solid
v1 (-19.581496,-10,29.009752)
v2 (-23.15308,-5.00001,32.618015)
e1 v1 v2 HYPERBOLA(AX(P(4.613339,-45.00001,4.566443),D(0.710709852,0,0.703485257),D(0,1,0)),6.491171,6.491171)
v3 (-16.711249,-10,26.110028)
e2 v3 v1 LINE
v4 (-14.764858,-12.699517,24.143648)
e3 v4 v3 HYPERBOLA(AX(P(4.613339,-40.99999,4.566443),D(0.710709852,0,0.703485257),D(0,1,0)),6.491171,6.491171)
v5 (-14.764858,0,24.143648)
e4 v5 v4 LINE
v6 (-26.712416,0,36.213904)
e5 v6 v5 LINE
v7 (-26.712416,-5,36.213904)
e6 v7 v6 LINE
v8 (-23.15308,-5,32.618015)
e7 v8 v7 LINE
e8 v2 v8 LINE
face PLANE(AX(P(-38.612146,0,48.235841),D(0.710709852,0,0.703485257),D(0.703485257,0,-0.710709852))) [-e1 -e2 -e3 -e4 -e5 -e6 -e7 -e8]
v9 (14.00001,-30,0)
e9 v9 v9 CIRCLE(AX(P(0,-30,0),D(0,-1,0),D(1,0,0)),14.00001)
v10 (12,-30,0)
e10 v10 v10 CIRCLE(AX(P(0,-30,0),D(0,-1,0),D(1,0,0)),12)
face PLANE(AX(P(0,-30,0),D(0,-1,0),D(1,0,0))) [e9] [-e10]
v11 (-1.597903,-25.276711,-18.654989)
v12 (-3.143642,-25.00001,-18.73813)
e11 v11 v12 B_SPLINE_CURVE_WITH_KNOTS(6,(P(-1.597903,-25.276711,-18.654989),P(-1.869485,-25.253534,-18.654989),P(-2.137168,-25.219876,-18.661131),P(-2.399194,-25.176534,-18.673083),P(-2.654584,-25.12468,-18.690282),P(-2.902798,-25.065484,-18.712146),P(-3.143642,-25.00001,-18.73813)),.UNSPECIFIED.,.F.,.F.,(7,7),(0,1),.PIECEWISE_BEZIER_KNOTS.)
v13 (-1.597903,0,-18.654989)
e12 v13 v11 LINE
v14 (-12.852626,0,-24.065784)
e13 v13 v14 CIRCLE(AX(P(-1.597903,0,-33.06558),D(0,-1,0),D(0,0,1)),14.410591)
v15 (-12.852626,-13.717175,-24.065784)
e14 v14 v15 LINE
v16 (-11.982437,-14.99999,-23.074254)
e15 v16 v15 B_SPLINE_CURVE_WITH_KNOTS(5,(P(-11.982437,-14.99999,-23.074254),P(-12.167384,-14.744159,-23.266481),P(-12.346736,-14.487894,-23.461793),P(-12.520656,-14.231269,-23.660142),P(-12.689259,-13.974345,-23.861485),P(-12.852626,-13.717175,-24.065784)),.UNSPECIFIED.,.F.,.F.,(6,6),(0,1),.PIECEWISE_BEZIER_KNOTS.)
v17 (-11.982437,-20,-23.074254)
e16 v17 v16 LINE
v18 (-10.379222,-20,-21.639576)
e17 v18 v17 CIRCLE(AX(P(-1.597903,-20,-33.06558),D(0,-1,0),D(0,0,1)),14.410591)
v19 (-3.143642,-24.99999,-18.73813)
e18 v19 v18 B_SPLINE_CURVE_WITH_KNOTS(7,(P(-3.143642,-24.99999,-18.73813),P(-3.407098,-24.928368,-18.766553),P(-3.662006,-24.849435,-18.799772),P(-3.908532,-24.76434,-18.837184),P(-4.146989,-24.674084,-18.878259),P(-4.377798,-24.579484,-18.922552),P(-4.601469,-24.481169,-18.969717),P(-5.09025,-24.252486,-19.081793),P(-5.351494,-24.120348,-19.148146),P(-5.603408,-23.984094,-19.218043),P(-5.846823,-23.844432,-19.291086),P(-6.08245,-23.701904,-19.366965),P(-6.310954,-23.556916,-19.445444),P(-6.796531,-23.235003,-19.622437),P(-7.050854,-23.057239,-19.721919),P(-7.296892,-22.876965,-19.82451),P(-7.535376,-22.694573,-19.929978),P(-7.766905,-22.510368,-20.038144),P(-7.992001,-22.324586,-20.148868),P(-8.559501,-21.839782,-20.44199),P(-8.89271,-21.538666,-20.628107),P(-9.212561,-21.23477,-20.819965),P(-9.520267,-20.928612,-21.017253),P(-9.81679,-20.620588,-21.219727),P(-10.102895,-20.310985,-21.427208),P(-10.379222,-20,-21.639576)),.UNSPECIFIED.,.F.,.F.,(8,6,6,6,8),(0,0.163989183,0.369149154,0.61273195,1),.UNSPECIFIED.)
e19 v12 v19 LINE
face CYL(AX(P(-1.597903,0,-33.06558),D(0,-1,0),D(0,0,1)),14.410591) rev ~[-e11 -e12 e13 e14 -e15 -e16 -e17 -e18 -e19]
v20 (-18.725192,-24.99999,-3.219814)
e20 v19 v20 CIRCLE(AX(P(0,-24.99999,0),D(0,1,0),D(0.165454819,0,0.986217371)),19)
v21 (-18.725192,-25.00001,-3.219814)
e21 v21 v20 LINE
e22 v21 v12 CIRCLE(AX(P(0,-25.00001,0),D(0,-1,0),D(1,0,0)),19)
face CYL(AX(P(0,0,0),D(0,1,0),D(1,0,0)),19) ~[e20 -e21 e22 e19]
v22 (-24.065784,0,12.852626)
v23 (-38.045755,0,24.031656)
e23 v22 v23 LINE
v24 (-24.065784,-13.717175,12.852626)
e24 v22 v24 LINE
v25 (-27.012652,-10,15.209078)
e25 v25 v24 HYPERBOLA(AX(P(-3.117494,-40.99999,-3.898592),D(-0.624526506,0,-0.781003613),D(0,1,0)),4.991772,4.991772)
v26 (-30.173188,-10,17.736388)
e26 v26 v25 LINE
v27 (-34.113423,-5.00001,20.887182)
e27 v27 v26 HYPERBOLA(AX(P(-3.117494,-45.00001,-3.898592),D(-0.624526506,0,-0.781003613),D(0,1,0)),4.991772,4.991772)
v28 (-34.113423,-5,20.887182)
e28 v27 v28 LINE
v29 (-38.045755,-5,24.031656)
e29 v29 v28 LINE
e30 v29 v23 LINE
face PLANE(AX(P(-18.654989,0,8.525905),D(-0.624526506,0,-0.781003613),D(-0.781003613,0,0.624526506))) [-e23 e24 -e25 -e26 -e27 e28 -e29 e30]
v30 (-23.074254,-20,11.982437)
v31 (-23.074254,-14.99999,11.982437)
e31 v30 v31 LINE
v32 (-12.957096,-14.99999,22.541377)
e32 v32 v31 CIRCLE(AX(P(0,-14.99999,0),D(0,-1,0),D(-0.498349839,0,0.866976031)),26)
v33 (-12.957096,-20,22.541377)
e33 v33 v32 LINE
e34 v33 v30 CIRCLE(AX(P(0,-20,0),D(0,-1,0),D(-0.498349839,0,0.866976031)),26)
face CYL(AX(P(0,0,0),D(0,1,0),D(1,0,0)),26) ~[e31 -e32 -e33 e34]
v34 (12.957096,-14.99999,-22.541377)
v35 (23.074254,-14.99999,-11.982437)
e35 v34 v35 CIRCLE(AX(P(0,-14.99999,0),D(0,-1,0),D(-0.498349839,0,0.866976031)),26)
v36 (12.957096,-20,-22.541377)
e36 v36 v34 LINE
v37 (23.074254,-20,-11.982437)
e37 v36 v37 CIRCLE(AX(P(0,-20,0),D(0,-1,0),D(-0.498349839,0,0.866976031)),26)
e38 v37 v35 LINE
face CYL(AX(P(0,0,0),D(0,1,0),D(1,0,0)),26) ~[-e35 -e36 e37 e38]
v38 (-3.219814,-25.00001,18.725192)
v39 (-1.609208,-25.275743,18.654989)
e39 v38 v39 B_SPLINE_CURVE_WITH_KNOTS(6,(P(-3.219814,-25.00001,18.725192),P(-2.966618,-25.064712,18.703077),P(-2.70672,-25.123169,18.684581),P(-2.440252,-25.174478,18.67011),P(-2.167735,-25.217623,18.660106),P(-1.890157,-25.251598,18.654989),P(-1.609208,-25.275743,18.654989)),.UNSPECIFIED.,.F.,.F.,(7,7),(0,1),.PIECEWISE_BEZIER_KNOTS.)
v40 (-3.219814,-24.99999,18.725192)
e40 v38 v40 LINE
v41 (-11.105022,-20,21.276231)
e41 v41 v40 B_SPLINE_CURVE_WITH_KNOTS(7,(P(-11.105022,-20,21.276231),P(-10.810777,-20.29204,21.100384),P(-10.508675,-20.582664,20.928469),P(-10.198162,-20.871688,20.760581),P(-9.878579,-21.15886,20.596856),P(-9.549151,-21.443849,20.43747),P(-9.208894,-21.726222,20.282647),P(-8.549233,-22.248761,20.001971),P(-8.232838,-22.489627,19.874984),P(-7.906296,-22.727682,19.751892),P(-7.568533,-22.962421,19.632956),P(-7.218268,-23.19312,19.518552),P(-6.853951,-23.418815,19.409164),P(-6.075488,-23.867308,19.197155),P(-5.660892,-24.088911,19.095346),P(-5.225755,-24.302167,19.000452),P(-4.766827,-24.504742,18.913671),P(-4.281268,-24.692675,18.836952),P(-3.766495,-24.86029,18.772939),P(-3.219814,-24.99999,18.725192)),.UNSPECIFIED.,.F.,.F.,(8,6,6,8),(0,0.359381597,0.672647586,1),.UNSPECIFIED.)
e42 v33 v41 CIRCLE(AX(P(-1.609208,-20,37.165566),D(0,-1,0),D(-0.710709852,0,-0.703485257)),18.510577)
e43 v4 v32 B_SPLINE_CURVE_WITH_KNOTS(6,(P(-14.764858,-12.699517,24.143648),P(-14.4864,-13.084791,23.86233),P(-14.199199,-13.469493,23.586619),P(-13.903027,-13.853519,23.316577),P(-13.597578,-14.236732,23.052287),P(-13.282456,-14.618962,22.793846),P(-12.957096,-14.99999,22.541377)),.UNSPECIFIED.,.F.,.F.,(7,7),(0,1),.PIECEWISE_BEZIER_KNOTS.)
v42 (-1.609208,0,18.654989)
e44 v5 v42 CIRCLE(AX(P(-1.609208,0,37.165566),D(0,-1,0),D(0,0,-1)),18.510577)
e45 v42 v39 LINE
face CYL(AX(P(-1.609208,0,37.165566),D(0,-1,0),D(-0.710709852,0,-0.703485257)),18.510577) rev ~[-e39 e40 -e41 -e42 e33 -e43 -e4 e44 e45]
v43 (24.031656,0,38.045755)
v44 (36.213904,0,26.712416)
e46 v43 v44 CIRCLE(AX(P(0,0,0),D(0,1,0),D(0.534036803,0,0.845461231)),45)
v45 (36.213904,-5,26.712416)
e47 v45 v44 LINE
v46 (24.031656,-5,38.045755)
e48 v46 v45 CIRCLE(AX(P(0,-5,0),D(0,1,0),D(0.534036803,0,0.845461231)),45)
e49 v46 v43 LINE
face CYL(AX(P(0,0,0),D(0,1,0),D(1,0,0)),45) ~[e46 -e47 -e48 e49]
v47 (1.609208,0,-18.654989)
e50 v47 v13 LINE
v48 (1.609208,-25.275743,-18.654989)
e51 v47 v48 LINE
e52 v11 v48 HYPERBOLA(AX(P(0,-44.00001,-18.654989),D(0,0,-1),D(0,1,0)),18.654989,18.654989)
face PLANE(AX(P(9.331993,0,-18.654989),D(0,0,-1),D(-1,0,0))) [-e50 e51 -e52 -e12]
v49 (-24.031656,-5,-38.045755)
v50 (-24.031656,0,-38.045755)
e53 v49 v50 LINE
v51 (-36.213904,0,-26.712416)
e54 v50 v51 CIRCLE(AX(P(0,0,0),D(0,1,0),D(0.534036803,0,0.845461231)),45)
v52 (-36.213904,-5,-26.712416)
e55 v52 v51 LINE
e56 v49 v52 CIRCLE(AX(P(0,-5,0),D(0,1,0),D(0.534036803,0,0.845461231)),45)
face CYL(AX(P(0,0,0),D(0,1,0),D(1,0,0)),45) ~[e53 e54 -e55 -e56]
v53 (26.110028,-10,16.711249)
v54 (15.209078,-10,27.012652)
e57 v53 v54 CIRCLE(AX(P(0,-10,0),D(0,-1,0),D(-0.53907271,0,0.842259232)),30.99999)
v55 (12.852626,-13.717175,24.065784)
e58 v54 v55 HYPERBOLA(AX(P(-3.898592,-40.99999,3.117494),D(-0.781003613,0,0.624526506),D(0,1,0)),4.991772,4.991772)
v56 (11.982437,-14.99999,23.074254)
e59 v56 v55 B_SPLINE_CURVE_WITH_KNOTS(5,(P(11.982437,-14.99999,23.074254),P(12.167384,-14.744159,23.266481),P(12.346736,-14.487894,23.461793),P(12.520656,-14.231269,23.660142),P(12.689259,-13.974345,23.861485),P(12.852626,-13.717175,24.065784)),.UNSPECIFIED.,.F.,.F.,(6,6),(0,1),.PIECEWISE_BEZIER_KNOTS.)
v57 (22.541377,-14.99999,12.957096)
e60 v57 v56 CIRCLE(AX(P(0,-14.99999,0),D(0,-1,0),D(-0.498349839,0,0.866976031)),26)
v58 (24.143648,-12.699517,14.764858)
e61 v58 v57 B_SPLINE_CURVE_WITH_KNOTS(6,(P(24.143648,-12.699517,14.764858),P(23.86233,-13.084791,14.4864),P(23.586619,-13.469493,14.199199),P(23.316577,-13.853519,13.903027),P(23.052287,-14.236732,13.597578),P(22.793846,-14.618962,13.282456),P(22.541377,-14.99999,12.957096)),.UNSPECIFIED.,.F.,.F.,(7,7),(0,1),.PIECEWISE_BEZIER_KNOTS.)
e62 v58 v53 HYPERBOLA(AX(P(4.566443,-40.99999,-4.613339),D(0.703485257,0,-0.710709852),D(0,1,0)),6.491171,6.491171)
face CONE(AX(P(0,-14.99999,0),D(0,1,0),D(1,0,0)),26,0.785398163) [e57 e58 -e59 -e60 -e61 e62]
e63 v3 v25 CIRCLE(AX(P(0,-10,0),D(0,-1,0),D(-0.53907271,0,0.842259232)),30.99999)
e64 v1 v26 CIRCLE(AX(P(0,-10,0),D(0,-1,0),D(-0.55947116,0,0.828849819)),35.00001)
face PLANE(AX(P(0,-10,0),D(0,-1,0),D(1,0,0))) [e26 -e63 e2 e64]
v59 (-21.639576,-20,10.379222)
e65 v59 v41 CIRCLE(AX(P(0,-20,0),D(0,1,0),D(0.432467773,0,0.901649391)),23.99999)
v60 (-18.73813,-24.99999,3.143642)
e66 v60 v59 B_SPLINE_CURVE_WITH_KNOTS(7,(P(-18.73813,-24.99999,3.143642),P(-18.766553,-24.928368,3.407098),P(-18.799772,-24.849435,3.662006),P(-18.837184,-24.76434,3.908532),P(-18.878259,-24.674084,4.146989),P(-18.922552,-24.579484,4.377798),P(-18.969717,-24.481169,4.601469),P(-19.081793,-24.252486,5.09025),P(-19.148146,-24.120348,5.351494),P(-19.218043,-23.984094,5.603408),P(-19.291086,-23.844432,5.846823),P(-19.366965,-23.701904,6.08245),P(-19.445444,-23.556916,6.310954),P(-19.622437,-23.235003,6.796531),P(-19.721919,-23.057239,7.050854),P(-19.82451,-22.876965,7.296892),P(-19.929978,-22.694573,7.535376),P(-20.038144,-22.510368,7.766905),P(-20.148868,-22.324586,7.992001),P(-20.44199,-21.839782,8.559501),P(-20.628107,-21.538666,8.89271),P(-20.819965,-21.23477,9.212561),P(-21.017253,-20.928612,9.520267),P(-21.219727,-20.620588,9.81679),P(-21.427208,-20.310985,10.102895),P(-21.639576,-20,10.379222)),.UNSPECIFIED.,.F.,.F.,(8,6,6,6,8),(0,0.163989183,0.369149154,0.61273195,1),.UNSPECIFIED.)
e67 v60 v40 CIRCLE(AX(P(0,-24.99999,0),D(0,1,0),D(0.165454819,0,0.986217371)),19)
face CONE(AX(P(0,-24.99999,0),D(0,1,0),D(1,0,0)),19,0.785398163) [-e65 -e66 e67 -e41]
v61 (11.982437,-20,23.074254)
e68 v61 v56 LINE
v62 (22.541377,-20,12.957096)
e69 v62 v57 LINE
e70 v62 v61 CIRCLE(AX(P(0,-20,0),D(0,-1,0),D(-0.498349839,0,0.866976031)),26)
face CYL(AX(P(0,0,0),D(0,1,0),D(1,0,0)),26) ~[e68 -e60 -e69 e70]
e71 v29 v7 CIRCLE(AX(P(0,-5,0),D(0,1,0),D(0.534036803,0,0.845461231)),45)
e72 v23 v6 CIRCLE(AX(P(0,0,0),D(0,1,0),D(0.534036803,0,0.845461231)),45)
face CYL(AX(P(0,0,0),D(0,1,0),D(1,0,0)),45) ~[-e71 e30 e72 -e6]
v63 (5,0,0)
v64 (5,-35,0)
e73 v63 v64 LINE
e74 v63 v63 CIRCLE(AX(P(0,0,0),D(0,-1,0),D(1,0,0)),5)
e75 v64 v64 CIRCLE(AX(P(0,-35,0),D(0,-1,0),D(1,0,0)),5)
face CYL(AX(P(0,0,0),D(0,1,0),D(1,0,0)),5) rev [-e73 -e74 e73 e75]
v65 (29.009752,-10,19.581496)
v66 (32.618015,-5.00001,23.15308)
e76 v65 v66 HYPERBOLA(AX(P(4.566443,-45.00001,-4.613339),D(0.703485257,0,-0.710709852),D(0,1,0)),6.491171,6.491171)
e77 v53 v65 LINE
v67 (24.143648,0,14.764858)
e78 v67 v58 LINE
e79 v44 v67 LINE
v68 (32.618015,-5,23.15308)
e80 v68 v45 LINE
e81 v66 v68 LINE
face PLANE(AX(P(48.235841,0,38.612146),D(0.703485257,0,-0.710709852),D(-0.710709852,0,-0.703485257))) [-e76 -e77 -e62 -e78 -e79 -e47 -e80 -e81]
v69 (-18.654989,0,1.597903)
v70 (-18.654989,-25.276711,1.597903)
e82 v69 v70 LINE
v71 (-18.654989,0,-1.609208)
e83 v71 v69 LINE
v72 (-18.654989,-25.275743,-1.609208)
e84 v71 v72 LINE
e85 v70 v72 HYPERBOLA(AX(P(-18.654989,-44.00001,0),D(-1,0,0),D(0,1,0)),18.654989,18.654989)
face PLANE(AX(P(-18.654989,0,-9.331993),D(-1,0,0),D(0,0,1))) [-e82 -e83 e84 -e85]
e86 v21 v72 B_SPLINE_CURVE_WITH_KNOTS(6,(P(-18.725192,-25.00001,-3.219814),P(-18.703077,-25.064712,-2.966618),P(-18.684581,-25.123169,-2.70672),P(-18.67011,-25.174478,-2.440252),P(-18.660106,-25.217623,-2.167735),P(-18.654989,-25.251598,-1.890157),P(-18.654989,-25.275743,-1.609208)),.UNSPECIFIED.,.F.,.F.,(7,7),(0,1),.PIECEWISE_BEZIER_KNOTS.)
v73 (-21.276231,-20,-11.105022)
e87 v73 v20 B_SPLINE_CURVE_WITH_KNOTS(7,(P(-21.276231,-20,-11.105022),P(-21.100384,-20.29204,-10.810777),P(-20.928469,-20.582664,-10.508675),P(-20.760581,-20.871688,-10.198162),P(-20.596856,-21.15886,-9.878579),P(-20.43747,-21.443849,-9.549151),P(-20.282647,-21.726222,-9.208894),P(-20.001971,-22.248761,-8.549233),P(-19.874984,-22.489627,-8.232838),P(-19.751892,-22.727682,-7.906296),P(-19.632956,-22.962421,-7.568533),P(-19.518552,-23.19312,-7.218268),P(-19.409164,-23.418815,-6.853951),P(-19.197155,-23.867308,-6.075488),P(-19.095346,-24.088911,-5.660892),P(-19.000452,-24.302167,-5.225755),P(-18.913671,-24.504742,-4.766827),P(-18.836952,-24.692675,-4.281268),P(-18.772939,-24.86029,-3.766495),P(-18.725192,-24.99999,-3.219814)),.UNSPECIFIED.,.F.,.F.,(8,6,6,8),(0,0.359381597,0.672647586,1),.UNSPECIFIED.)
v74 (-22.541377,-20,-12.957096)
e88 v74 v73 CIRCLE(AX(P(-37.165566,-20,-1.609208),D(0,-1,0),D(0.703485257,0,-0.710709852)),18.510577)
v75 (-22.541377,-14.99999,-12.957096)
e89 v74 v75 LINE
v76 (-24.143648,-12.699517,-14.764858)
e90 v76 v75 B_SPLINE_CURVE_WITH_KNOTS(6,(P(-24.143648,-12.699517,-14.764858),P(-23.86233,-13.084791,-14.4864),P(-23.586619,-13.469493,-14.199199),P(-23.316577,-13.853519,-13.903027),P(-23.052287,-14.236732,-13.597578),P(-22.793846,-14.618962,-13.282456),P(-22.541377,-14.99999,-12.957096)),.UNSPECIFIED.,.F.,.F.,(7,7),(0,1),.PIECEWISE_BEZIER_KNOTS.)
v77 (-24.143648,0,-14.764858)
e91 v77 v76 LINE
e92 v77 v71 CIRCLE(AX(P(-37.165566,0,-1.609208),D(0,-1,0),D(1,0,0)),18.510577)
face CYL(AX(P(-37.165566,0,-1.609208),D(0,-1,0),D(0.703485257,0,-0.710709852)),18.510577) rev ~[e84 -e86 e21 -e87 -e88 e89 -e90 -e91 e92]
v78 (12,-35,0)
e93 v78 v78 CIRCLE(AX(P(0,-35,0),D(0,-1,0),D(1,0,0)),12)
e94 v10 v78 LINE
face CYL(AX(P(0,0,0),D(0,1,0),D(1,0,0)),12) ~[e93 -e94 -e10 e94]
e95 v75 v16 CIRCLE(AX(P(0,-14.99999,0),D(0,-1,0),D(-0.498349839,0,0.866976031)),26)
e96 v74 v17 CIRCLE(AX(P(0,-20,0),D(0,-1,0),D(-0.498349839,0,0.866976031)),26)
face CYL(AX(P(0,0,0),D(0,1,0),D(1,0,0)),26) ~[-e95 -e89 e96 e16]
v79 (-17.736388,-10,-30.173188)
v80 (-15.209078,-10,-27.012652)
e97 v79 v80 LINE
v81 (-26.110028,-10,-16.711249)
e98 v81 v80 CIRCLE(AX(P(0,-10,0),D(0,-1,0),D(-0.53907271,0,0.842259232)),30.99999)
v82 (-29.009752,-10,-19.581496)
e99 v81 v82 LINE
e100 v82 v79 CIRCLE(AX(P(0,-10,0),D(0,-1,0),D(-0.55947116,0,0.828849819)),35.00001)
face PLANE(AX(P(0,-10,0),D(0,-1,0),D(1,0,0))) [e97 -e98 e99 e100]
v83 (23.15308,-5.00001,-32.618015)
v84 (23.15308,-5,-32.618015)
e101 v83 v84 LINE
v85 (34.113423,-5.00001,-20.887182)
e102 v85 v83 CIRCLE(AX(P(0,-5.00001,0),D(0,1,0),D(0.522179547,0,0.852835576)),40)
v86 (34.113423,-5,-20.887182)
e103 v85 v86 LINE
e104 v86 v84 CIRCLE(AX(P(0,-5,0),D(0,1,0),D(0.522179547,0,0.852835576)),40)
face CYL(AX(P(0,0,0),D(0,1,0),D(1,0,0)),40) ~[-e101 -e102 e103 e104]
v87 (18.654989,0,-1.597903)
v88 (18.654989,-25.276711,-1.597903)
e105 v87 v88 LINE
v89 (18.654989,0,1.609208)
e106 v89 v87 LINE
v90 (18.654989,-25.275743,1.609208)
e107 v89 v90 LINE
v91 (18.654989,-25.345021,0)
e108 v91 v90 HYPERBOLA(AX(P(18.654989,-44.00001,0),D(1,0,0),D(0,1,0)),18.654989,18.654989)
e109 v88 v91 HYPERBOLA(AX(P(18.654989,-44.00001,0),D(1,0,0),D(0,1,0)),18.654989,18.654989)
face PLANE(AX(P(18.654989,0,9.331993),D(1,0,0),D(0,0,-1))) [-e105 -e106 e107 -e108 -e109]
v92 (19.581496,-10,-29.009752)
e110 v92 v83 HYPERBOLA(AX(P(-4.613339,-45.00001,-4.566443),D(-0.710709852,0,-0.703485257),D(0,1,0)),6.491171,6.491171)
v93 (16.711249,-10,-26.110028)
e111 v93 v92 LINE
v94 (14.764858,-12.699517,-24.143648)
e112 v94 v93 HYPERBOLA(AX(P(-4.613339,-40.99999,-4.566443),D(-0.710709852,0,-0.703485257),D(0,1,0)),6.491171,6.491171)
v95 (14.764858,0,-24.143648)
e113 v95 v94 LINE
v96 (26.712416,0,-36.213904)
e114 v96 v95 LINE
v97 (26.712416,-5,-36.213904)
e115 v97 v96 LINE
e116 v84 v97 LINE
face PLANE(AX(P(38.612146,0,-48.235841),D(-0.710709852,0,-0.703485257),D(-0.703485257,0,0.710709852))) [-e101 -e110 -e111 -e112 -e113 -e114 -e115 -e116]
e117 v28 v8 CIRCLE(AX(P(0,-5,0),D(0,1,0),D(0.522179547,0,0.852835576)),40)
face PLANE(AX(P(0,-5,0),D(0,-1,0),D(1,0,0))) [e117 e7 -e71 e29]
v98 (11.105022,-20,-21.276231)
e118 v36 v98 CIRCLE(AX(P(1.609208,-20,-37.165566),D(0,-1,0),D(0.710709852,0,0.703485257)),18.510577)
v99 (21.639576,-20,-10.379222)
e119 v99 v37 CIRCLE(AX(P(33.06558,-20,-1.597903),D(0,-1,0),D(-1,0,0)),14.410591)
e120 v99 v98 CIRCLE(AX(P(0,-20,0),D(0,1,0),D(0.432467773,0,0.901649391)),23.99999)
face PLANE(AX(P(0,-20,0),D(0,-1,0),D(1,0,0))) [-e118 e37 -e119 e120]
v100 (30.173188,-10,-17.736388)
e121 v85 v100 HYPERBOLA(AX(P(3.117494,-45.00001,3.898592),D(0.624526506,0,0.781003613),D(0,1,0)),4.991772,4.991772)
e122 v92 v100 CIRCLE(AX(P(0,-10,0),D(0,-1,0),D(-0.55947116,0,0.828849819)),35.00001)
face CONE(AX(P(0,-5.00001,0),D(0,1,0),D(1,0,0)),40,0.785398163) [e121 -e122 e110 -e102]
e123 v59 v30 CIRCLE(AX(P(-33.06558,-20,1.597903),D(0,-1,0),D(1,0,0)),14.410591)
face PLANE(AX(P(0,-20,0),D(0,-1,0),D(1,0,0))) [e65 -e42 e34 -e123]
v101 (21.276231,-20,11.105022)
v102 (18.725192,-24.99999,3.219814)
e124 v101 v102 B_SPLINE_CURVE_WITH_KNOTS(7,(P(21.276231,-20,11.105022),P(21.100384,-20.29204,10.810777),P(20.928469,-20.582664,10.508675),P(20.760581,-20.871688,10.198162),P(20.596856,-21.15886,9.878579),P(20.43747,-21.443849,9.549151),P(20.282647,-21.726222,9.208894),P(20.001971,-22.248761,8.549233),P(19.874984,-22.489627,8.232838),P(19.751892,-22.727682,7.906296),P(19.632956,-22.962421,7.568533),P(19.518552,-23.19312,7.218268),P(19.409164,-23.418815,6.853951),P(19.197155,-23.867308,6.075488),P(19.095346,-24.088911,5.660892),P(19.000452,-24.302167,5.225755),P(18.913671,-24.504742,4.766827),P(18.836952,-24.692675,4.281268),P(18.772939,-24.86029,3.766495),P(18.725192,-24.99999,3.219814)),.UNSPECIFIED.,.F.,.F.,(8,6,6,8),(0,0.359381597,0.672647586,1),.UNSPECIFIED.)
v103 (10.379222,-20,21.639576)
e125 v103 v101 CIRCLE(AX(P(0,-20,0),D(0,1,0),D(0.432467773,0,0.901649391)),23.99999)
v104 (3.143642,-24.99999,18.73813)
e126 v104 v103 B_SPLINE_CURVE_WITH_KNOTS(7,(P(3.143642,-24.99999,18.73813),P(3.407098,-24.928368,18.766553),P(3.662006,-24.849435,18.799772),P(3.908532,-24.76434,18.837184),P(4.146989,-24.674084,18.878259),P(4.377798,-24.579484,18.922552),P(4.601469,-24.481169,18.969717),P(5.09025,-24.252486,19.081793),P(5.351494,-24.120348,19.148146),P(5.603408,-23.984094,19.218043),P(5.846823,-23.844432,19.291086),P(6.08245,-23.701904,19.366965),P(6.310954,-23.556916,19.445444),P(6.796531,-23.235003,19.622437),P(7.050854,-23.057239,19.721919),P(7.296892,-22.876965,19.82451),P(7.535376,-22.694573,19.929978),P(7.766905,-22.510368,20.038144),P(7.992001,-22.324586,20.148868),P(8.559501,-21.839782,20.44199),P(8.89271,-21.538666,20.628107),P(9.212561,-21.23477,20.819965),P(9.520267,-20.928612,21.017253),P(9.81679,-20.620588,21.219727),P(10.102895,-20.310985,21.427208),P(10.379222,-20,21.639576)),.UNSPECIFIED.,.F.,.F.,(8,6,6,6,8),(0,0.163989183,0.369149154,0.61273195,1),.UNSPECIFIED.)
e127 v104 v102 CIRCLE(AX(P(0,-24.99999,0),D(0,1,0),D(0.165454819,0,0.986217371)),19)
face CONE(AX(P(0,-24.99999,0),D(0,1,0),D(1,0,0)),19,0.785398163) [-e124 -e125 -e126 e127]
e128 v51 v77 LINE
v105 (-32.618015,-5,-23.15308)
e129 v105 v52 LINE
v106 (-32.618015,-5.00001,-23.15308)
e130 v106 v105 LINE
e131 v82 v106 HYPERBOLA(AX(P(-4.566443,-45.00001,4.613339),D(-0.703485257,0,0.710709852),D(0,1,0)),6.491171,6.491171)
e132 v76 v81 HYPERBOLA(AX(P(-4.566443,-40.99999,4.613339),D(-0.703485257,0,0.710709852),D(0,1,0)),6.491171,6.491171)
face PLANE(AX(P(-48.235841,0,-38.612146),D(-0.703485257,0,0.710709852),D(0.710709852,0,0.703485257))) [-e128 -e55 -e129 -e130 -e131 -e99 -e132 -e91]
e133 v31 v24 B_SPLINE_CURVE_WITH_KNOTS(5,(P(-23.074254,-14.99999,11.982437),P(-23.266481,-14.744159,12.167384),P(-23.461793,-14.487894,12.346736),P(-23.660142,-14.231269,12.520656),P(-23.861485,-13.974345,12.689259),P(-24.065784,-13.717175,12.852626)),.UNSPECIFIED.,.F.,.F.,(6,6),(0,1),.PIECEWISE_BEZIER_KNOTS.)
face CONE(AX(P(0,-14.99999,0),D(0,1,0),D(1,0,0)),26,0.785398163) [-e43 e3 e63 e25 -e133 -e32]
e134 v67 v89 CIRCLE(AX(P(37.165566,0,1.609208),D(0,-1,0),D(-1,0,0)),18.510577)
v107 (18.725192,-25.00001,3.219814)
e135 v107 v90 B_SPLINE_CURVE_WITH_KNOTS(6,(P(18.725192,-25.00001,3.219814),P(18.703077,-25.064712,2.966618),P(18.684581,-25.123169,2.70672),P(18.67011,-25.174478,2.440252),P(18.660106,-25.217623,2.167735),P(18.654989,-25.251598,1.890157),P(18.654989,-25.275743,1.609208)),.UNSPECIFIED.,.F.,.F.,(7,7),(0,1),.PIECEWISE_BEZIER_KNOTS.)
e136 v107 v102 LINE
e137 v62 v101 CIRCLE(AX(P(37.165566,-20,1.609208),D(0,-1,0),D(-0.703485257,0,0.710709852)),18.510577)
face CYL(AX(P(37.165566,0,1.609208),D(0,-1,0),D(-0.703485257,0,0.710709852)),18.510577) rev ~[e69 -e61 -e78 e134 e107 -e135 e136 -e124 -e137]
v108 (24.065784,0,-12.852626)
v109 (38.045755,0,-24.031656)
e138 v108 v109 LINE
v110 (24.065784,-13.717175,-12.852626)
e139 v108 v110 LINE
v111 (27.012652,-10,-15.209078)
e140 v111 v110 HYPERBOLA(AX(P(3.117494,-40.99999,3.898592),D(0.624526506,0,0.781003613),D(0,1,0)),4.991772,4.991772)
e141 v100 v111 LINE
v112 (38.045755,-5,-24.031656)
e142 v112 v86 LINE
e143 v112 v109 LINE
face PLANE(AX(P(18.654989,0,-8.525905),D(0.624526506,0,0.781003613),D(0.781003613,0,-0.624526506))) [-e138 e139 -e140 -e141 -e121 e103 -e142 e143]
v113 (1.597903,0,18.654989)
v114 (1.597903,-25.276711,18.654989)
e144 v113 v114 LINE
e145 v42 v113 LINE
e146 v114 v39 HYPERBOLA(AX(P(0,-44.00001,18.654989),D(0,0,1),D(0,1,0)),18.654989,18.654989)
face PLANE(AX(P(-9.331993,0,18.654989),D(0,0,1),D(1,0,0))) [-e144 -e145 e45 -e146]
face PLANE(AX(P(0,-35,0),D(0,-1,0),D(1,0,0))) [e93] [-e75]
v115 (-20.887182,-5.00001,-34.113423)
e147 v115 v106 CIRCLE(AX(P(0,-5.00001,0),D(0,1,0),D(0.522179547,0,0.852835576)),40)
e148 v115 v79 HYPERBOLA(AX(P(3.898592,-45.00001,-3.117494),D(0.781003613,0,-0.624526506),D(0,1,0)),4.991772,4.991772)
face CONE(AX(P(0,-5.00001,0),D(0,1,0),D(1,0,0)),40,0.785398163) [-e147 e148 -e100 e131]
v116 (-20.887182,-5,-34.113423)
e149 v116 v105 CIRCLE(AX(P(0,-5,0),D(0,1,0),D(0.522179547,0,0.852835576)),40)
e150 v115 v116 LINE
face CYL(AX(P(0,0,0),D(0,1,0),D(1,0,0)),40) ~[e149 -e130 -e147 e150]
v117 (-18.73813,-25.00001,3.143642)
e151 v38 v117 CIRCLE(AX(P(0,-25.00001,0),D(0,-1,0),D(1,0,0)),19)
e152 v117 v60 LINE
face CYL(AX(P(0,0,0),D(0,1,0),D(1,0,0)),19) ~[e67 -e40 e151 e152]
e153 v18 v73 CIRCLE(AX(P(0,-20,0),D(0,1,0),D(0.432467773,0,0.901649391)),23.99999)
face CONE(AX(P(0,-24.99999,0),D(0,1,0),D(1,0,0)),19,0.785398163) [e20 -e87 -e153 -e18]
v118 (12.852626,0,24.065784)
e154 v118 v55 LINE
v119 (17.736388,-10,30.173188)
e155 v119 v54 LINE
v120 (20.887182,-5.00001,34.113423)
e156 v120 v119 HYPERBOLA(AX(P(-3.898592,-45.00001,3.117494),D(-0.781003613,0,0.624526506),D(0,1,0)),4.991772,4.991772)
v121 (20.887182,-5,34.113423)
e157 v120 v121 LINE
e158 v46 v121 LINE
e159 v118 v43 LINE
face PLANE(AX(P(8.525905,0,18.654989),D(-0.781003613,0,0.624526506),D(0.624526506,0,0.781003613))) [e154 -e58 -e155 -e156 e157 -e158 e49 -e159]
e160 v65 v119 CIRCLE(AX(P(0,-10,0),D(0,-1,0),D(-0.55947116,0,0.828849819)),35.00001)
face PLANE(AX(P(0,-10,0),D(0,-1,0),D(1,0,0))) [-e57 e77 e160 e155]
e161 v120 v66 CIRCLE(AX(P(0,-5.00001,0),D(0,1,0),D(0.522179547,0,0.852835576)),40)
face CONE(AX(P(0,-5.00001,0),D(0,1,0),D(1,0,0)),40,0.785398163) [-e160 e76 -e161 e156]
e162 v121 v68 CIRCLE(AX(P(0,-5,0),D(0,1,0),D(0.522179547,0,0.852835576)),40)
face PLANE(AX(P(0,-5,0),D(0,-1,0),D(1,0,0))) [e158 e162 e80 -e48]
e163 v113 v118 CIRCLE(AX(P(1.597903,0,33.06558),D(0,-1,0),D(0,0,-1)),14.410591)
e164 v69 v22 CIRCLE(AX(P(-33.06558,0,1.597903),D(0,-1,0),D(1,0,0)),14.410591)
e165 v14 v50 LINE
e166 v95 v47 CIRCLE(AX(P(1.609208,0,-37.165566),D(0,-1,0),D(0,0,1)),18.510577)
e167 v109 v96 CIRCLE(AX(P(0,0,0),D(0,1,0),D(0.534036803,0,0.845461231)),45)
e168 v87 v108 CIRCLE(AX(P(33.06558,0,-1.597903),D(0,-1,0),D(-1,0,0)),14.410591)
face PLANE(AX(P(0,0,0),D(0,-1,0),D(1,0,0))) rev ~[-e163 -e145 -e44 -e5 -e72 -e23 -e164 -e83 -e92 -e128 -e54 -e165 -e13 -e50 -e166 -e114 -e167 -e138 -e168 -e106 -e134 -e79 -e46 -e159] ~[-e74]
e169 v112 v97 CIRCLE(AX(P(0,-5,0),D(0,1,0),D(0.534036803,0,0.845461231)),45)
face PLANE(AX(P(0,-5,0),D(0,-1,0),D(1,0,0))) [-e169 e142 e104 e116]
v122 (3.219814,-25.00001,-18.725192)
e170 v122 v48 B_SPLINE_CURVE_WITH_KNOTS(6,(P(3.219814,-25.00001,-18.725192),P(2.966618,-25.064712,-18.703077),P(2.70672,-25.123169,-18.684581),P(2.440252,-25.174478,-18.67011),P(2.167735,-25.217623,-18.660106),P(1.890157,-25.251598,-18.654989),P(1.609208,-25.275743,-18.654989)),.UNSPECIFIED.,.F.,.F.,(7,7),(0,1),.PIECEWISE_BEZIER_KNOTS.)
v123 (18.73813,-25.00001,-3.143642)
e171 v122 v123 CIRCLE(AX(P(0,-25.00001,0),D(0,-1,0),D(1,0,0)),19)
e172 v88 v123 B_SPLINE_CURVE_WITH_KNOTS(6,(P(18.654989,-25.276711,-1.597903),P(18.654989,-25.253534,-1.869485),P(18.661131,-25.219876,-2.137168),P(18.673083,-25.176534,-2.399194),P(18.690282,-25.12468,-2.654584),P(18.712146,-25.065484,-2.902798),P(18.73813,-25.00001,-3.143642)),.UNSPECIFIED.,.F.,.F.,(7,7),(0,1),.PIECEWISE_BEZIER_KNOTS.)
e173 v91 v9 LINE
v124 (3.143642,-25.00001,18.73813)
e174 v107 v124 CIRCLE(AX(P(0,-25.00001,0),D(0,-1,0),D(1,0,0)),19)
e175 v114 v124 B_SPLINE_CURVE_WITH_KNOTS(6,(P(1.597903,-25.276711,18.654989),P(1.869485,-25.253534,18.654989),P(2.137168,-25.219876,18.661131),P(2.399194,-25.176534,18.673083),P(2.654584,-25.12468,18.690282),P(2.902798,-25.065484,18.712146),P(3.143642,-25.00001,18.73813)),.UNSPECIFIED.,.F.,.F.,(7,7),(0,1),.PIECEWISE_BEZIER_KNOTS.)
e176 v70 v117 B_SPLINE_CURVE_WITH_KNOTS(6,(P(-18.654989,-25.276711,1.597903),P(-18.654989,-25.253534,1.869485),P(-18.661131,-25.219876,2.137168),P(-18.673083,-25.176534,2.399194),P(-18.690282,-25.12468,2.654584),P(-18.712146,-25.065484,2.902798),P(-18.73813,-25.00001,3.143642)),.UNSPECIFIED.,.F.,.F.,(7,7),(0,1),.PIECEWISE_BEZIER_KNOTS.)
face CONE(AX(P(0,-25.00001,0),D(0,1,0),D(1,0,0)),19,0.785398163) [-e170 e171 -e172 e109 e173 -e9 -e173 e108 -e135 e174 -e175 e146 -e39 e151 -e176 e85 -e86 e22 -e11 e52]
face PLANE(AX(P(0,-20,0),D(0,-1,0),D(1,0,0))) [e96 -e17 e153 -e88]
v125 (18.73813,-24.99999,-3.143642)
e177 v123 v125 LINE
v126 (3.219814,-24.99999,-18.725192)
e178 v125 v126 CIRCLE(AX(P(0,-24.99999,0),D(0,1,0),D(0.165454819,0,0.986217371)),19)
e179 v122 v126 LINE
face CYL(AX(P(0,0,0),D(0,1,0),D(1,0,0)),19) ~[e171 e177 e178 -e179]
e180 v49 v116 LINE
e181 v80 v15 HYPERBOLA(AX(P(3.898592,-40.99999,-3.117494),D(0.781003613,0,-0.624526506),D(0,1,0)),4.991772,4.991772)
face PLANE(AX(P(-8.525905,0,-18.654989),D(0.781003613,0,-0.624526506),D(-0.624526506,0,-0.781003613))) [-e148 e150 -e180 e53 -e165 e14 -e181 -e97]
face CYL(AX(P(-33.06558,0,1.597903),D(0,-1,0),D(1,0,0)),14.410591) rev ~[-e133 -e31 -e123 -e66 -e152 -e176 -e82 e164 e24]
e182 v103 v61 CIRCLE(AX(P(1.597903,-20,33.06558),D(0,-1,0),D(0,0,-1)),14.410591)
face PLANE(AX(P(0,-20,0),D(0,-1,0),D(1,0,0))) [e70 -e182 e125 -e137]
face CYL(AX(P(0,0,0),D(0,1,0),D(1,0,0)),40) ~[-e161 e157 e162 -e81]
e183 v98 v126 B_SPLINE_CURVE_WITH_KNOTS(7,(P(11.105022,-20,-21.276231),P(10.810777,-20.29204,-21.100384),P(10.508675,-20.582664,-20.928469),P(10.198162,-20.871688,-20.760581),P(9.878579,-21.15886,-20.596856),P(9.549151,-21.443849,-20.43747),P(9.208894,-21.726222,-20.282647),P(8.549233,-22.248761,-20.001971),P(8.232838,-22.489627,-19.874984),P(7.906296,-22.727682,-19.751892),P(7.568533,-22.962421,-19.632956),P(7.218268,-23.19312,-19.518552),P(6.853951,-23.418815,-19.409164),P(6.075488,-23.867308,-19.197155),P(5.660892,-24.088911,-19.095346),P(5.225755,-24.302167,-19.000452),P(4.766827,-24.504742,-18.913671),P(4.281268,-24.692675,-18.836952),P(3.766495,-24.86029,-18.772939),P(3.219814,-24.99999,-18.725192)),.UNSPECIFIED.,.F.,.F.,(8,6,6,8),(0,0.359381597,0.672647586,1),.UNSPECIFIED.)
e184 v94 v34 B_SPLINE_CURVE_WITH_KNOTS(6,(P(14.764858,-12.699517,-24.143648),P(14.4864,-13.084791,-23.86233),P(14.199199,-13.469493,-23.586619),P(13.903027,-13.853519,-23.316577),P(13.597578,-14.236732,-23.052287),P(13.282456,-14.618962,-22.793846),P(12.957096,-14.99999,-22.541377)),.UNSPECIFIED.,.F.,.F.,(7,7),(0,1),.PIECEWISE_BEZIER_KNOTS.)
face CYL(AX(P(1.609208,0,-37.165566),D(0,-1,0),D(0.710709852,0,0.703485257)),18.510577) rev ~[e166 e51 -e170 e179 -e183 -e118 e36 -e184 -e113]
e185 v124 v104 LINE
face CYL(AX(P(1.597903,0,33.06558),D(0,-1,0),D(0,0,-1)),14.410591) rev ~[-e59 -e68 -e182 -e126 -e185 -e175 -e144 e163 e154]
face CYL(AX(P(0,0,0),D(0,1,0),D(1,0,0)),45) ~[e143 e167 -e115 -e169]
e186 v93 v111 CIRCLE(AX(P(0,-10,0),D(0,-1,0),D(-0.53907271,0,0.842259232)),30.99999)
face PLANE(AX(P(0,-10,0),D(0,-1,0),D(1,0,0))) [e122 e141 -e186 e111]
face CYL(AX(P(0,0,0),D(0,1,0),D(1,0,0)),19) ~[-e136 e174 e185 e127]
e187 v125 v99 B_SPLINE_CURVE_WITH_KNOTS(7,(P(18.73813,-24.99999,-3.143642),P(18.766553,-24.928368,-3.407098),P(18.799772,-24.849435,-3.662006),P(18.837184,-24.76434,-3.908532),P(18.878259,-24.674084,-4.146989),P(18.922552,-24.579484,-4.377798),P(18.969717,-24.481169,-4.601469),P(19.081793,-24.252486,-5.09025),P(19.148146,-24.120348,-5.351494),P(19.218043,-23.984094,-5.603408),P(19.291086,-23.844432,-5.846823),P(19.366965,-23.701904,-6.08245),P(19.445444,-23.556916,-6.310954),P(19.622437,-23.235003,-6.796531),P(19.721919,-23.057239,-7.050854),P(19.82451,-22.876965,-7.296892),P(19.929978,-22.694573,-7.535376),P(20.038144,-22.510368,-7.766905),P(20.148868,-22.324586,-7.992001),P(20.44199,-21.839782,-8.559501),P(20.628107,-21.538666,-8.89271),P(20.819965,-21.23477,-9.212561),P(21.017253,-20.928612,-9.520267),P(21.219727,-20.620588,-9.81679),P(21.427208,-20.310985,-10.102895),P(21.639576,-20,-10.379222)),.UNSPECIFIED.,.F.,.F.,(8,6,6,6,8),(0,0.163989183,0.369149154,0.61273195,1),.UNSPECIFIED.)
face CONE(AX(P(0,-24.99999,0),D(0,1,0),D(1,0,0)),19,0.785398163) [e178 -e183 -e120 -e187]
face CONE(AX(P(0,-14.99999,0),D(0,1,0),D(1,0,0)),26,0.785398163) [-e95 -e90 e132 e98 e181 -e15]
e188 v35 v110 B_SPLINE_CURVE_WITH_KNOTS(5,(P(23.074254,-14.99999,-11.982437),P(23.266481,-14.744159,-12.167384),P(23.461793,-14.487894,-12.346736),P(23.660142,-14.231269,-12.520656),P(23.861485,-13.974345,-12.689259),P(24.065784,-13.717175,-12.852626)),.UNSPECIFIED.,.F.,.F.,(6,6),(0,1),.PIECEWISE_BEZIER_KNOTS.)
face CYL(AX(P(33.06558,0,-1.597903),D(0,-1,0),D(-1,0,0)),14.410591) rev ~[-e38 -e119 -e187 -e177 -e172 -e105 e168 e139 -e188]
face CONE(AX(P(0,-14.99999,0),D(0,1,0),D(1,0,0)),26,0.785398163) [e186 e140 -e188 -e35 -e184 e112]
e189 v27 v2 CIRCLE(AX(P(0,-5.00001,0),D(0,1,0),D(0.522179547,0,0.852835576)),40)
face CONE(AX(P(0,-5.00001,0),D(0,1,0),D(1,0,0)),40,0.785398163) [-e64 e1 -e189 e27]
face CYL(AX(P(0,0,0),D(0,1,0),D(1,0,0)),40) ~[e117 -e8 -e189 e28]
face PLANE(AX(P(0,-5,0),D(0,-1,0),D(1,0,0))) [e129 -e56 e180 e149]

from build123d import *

# Parameters (mm, degrees)
F0_R      = 12
F0_R_2    = 5
F1_DEPTH  = 35
F0_R_3    = 19
F2_DEPTH  = 30
F0_R_4    = 26
F3_DEPTH  = 20
F0_R_5    = 40
F4_DEPTH  = 10
F0_R_6    = 45
F5_DEPTH  = 5
F9_SIZE   = 4.99999
F10_DEPTH = 50
F11_SIZE  = 4.99999
F13_DEPTH = 50
F14_R     = 18.5105769834
F15_R     = 14.4105910726
F16_ANGLE = 90
F17_ANGLE = 180
F18_ANGLE = 270


# Not quite as in the source:
# - a fillet or chamfer is up to 0.001 mm smaller than in the source, because OpenCascade refuses the exact size


with BuildPart() as f1:
    # F0 (on Front) → F1 (new body)
    with BuildSketch(Plane.XZ):
        Circle(F0_R)
        Circle(F0_R_2, mode=Mode.SUBTRACT)
    extrude(amount=F1_DEPTH)

    # F0 (on Front) → F2 (join)
    with BuildSketch(Plane.XZ):
        Circle(F0_R_3)
        Circle(F0_R, mode=Mode.SUBTRACT)
    extrude(amount=F2_DEPTH)

    # F0 (on Front) → F3 (join)
    with BuildSketch(Plane.XZ):
        Circle(F0_R_4)
        Circle(F0_R_3, mode=Mode.SUBTRACT)
    extrude(amount=F3_DEPTH)

    # F0 (on Front) → F4 (join)
    with BuildSketch(Plane.XZ):
        Circle(F0_R_5)
        Circle(F0_R_4, mode=Mode.SUBTRACT)
    extrude(amount=F4_DEPTH)

    # F0 (on Front) → F5 (join)
    with BuildSketch(Plane.XZ):
        Circle(F0_R_6)
        Circle(F0_R_5, mode=Mode.SUBTRACT)
    extrude(amount=F5_DEPTH)

    # F9 (size 5 in the source; OpenCascade refuses exactly that, so slightly less here)
    f9_edges = [f1.edges().sort_by_distance(p)[0] for p in [
        (-40, -10, 0),
        (-26, -10, 0),
    ]]
    chamfer(f9_edges, length=F9_SIZE)

    # F0 (on Front) → F10 (cut)
    with BuildSketch(Plane.XZ):
        Circle(F0_R_2)
    extrude(amount=-F10_DEPTH, mode=Mode.SUBTRACT)

    # F11 (size 5 in the source; OpenCascade refuses exactly that, so slightly less here)
    f11_edges = [f1.edges().sort_by_distance(p)[0] for p in [
        (-19, -20, 0),
        (19, -25, 0),
        (-19, -30, 0),
    ]]
    chamfer(f11_edges, length=F11_SIZE)


with BuildPart() as f13:
    # F12 (on Front) → F13 (new body)
    with BuildSketch(Plane.XZ):
        Polygon((30.8662448078, 46.592772007), (-38.6121459305, 48.2358410954), (-9.3319928274, 18.6549890786), (8.5259051993, 18.6549890786), align=None)
    extrude(amount=F13_DEPTH)

    # F14
    f14_edges = [f13.edges().sort_by_distance(p)[0] for p in [
        (-9.331993, -25, 18.654989),
    ]]
    fillet(f14_edges, radius=F14_R)

    # F15
    f15_edges = [f13.edges().sort_by_distance(p)[0] for p in [
        (8.525905, -25, 18.654989),
    ]]
    fillet(f15_edges, radius=F15_R)


with BuildPart() as f16_1:
    # F16: copy of F13
    add(f13.part.rotate(Axis((0, -35.1110678166, 0), (0, 1, 0)), F16_ANGLE))


with BuildPart() as f17_1:
    # F17: copy of F13
    add(f13.part.rotate(Axis((0, -20.7477975637, 0), (0, 1, 0)), F17_ANGLE))


with BuildPart() as f18_1:
    # F18: copy of F13
    add(f13.part.rotate(Axis((0, -17.8390480578, 0), (0, 1, 0)), F18_ANGLE))


with BuildPart() as f1_1:
    add(f1.part)

    # F19: cut F13
    add(f13.part, mode=Mode.SUBTRACT)

    # F20: cut F17_1
    add(f17_1.part, mode=Mode.SUBTRACT)

    # F21: cut F16_1
    add(f16_1.part, mode=Mode.SUBTRACT)

    # F22: cut F18_1
    add(f18_1.part, mode=Mode.SUBTRACT)


solid = f1_1.part
